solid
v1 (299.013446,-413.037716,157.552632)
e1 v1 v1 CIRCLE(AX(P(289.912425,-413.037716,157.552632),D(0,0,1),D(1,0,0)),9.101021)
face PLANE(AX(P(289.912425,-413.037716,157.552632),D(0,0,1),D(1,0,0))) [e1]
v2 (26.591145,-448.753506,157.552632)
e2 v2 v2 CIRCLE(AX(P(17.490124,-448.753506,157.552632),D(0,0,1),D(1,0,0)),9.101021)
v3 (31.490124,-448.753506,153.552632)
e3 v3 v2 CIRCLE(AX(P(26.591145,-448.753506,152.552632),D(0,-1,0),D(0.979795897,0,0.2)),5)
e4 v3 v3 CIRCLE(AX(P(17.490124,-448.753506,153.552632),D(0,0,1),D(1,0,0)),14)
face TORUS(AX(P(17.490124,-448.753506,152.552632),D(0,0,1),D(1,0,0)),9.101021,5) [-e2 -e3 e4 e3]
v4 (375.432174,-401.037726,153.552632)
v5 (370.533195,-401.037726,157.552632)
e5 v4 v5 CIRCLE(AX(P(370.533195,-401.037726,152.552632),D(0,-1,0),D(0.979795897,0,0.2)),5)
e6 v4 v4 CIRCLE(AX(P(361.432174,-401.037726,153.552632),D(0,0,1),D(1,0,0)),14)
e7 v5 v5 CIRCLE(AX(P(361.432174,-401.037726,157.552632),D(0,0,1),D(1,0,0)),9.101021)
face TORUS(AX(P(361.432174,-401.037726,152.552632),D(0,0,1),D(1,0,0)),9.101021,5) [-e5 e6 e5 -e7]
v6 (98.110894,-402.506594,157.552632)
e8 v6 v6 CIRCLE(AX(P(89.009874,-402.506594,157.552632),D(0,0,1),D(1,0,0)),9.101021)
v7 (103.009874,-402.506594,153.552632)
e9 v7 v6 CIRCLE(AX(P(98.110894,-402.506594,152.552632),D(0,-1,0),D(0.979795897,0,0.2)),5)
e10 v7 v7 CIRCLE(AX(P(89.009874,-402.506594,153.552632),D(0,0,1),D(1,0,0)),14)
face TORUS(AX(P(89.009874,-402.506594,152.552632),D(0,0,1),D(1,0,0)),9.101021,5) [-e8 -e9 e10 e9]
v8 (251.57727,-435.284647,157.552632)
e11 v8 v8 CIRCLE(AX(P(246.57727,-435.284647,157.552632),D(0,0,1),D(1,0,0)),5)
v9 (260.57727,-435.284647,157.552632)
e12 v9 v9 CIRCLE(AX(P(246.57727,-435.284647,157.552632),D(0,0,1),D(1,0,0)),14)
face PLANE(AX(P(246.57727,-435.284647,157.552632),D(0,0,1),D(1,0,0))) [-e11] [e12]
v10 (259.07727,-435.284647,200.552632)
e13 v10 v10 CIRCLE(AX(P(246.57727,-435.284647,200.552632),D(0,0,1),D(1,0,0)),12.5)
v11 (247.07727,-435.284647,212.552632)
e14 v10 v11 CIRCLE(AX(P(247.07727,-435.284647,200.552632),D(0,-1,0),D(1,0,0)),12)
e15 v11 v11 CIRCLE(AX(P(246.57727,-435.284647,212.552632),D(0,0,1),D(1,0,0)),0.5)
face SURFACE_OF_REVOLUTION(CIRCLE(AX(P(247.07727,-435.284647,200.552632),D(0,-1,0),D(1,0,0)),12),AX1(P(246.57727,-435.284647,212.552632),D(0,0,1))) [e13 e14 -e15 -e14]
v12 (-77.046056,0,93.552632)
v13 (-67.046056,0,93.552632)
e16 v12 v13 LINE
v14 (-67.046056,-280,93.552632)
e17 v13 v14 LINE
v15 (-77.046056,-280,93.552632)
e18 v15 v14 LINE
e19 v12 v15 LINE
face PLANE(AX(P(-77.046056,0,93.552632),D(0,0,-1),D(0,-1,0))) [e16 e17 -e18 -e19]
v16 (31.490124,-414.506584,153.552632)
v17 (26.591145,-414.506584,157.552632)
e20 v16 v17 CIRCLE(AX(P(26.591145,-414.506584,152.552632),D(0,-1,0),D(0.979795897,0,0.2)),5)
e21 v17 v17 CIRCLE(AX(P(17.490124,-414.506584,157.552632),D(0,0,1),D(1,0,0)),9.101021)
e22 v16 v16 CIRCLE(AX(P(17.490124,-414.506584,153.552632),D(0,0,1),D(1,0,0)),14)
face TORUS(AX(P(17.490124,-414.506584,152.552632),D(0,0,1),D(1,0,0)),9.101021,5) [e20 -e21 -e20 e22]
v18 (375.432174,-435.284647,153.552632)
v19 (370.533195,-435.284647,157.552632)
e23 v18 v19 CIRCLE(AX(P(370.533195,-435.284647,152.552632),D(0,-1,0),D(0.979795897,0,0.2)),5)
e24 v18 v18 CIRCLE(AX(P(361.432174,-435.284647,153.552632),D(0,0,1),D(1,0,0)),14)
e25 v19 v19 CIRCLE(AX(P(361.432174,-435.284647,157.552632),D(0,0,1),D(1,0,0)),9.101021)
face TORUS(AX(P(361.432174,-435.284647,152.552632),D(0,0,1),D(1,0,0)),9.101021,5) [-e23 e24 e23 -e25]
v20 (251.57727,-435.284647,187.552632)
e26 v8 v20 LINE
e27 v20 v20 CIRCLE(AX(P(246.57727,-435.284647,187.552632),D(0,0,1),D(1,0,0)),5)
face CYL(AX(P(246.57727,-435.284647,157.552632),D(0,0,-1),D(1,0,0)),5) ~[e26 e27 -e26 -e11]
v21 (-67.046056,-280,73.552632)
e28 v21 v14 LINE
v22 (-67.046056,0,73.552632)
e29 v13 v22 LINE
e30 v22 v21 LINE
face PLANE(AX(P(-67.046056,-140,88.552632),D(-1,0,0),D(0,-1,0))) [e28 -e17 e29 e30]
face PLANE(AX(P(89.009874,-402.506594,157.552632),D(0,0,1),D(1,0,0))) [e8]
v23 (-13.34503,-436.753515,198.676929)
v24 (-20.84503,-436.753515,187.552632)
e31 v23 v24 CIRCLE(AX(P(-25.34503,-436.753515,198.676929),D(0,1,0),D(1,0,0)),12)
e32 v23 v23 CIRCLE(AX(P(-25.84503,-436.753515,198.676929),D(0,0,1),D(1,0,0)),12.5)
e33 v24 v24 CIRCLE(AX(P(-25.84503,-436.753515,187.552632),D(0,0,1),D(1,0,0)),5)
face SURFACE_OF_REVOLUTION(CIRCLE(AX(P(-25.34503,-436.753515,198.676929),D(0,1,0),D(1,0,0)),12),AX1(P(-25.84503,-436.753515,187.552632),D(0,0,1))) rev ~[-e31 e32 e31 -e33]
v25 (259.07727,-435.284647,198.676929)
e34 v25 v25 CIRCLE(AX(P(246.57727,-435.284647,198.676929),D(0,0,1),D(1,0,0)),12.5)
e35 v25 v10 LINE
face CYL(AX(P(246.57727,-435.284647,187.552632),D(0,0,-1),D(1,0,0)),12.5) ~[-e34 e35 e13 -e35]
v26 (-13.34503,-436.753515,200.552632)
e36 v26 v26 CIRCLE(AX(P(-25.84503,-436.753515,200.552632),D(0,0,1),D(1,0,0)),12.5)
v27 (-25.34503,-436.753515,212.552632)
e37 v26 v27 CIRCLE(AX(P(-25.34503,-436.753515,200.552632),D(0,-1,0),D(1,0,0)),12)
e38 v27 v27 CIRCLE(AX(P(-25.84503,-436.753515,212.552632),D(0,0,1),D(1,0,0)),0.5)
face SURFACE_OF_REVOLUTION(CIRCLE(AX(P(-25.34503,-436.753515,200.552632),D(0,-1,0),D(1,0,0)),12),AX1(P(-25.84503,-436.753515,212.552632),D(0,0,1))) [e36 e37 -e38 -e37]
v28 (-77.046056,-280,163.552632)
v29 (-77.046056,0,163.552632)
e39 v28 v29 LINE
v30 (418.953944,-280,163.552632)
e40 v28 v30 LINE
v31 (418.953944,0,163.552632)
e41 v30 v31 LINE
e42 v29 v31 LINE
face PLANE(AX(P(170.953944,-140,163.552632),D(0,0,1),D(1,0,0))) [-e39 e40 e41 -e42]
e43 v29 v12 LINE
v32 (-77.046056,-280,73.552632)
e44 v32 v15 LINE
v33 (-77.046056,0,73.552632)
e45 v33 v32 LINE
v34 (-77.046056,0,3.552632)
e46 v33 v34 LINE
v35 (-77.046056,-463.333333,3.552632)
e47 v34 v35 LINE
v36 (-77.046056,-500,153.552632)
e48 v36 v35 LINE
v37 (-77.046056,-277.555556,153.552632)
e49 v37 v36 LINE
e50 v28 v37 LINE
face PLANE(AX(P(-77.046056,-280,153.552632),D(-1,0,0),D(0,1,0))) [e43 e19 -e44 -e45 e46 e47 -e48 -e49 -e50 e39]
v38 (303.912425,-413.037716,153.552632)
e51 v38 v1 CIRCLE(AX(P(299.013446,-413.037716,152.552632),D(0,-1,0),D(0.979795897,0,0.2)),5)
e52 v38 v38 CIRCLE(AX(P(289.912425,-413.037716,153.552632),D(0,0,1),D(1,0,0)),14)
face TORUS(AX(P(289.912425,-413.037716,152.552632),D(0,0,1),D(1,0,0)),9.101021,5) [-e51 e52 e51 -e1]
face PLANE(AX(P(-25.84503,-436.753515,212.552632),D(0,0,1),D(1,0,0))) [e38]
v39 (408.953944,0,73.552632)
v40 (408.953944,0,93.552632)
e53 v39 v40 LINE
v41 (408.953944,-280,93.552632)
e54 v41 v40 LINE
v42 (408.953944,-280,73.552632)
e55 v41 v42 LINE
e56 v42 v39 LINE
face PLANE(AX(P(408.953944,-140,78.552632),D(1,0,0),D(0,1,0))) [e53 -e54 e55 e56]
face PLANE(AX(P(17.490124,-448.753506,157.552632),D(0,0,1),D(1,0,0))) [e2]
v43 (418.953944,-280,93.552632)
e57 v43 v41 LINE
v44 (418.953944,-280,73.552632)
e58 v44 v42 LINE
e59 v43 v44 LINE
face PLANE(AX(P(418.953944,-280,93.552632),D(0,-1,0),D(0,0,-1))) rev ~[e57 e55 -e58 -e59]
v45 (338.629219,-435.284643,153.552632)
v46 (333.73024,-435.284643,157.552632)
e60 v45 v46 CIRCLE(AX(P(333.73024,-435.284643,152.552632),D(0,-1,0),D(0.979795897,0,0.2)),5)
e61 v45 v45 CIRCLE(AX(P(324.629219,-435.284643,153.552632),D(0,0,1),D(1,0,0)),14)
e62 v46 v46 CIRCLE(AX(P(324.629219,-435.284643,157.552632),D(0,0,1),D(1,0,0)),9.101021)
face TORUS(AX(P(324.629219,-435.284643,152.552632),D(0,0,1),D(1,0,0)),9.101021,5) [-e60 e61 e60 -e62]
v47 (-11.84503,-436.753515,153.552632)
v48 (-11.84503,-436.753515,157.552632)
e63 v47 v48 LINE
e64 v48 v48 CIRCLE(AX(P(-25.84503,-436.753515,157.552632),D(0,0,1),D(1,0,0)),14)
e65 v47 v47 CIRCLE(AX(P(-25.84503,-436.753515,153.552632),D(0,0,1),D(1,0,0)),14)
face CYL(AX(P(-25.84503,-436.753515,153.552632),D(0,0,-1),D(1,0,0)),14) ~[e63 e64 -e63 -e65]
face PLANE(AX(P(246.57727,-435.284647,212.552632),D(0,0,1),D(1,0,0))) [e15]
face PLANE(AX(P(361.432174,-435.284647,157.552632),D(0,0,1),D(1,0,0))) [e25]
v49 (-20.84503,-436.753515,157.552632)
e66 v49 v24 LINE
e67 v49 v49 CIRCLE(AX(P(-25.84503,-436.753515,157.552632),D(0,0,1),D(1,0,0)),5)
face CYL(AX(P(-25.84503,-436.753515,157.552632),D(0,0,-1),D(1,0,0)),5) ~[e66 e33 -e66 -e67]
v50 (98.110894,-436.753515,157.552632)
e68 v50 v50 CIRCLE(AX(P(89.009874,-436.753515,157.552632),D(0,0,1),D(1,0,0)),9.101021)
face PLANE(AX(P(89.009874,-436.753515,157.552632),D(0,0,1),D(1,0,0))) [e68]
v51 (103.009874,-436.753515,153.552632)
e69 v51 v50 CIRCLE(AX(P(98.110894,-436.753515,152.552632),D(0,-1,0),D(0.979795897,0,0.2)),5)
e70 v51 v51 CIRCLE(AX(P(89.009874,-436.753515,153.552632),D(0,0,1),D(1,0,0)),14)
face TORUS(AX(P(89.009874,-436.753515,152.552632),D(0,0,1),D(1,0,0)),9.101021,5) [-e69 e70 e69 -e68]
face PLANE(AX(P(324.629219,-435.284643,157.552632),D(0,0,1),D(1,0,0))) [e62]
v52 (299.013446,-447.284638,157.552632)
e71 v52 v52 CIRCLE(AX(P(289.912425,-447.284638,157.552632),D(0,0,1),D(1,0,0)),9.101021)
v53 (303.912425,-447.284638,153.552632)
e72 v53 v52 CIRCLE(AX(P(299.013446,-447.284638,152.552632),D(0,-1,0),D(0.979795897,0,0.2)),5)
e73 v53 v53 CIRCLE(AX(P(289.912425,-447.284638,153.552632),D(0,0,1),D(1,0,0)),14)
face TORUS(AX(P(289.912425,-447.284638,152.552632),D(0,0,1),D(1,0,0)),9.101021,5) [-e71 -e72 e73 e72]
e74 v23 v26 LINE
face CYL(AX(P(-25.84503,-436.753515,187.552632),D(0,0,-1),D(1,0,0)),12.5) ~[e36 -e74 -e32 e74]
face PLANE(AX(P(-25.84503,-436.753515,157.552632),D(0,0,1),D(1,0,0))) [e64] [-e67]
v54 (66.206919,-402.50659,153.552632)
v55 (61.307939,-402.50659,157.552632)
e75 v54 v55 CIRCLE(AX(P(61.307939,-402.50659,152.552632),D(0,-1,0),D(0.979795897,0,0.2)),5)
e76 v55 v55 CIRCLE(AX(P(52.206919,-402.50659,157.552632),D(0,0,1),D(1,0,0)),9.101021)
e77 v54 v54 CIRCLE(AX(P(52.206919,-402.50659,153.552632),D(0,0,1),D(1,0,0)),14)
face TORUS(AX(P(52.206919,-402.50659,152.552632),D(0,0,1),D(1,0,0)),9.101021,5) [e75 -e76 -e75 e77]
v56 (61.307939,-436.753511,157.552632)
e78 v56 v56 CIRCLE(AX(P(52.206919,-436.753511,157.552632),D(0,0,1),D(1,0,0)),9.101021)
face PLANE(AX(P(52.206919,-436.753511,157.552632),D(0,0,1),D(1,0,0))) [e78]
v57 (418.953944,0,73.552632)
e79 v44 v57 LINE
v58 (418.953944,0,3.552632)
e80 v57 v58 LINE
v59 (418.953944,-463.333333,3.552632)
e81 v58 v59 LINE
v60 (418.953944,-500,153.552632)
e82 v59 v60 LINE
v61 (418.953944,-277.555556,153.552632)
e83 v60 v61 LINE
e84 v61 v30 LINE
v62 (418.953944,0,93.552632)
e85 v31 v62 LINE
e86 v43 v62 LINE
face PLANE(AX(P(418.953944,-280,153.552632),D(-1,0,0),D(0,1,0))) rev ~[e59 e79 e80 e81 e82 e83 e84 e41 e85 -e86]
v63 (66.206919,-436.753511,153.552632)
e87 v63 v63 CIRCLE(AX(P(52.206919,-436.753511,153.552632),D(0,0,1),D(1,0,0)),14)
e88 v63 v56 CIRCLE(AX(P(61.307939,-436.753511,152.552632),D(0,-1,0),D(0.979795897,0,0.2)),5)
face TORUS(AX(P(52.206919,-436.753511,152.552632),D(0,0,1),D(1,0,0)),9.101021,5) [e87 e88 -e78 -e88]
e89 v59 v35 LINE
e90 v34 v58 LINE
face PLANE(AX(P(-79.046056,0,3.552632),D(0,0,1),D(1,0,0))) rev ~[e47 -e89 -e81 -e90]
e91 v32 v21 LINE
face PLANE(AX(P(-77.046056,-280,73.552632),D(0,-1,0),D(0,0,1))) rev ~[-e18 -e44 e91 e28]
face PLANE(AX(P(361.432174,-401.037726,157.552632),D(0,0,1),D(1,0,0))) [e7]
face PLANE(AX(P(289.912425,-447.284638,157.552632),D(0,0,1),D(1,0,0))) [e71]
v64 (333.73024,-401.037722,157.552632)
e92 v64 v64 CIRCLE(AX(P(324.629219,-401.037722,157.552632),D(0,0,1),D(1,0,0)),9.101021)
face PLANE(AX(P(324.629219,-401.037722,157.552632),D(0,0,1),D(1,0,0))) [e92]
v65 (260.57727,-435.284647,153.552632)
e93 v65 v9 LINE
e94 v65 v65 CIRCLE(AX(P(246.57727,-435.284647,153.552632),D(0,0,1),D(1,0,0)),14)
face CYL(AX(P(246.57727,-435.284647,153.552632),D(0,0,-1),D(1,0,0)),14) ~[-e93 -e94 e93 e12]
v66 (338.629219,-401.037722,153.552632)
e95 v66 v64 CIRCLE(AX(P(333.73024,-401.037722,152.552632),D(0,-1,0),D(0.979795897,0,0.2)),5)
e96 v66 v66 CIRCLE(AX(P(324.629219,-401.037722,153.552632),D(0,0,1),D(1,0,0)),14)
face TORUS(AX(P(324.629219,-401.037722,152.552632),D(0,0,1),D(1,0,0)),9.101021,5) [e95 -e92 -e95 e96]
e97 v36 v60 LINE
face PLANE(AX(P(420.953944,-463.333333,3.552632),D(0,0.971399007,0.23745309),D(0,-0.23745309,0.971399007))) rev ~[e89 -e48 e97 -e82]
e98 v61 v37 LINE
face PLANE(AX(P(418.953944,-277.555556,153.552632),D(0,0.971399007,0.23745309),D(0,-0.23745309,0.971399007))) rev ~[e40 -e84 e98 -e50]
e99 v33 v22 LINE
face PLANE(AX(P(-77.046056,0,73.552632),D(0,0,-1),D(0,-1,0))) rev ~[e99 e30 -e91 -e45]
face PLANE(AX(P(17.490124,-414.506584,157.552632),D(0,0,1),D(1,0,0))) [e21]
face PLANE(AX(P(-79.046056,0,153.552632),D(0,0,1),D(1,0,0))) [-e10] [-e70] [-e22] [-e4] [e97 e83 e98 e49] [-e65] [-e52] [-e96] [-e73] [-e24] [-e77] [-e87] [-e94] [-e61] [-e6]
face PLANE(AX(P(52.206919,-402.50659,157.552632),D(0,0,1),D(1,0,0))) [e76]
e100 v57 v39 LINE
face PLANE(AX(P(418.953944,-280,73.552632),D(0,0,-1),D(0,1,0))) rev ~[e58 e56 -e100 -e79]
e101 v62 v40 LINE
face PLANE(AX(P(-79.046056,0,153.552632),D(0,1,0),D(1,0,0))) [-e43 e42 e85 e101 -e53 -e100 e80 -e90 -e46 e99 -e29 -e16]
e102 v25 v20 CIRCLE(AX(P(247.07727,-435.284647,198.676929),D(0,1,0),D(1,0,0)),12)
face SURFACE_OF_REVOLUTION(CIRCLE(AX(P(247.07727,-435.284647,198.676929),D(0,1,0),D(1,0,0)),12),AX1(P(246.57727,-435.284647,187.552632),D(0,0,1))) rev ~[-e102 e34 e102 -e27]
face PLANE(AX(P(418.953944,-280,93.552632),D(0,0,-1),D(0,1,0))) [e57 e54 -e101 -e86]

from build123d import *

# Parameters (mm, degrees)
F0_W      = 500
F0_H      = 150
F1_DEPTH  = 500
F3_DEPTH  = 546
F4_W      = 500
F4_H      = 280
F5_DEPTH  = 10
F6_DEPTH  = 2
F7_DEPTH  = 2
F8_W      = 280
F8_H      = 10
F9_DEPTH  = 10
F10_W     = 280
F10_H     = 10
F11_DEPTH = 10
F12_R     = 14
F13_DEPTH = 4
F15_R     = 5
F16_DEPTH = 30
F17_R     = 5
F18_DEPTH = 30
F19_R     = 12.5
F19_R_2   = 5
F20_DEPTH = 25
F22_R     = 12.5
F22_R_2   = 5
F23_DEPTH = 25
F26_DEPTH = 496.001


# Not quite as in the source:
# - a fillet or chamfer that OpenCascade refuses, or shapes differently, is made with other operations: its cross-section is extruded or revolved along the edge and cut away or added


with BuildPart() as f1:
    # F0 (on Front) → F1 (new body)
    with BuildSketch(Plane.XZ):
        with Locations((170.9539443254, 78.5526317079)):
            Rectangle(F0_W, F0_H)
    extrude(amount=F1_DEPTH)

    # F2 (on face) → F3 (cut)
    with BuildSketch(Plane.YZ.offset(420.9539443254)):
        Polygon((-463.3333333489, 3.5526317079), (-500, 153.5526317079), (-500, 3.5526317079), align=None)
    extrude(amount=-F3_DEPTH, mode=Mode.SUBTRACT)

    # F4 (on face) → F5 (join)
    with BuildSketch(Plane.XY.offset(153.5526317079)):
        with Locations((170.9539443254, -140)):
            Rectangle(F4_W, F4_H)
    extrude(amount=F5_DEPTH)

    # F6 (cut): a face of the model
    f6_faces = [f1.faces().sort_by_distance(p)[0] for p in [
        (420.9539443254, -237.1833592457, 82.4533645522),
    ]]
    extrude(f6_faces, amount=-F6_DEPTH, mode=Mode.SUBTRACT)

    # F7 (cut): a face of the model
    f7_faces = [f1.faces().sort_by_distance(p)[0] for p in [
        (-79.0460556746, -237.1833592457, 82.4533645522),
    ]]
    extrude(f7_faces, amount=-F7_DEPTH, mode=Mode.SUBTRACT)

    # F8 (on face) → F9 (cut)
    with BuildSketch(Plane(origin=(-77.0460556746, 0, 0), x_dir=(0, -1, 0), z_dir=(-1, 0, 0))):
        with Locations((140, 88.5526317079)):
            Rectangle(F8_W, F8_H)
        with Locations((140, 78.5526317079)):
            Rectangle(F8_W, F8_H)
    extrude(amount=-F9_DEPTH, mode=Mode.SUBTRACT)

    # F10 (on face) → F11 (cut)
    with BuildSketch(Plane.YZ.offset(418.9539443254)):
        with Locations((-140, 78.5526317079)):
            Rectangle(F10_W, F10_H)
        with Locations((-140, 88.5526317079)):
            Rectangle(F10_W, F10_H)
    extrude(amount=-F11_DEPTH, mode=Mode.SUBTRACT)

    # F12 (on face) → F13 (join)
    with BuildSketch(Plane.XY.offset(153.5526317079)):
        with Locations((-25.8450303767, -436.7535151103)):
            Circle(F12_R)
        with Locations((17.4901243299, -448.7535059452)):
            Circle(F12_R)
        with Locations((52.2069185972, -436.7535114288)):
            Circle(F12_R)
        with Locations((89.009873569, -436.7535151103)):
            Circle(F12_R)
        with Locations((89.009873569, -402.506593571)):
            Circle(F12_R)
        with Locations((52.2069185972, -402.5065898895)):
            Circle(F12_R)
        with Locations((17.4901243299, -414.5065844059)):
            Circle(F12_R)
        with Locations((246.577270329, -435.284647045)):
            Circle(F12_R)
        with Locations((289.9124250357, -447.2846378799)):
            Circle(F12_R)
        with Locations((289.9124250357, -413.0377163406)):
            Circle(F12_R)
        with Locations((324.6292193029, -435.2846433635)):
            Circle(F12_R)
        with Locations((324.6292193029, -401.0377218242)):
            Circle(F12_R)
        with Locations((361.4321742747, -401.0377255057)):
            Circle(F12_R)
        with Locations((361.4321742747, -435.284647045)):
            Circle(F12_R)
    extrude(amount=F13_DEPTH)

    # F14: fillet of radius 5 on 12 edges, made by hand

    # F14_s1 → F14_t2 (revolve, cut)
    with BuildSketch(Plane.XZ.offset(448.7535059452)):
        with BuildLine():
            ThreePointArc((31.4901243299, 153.5526317079), (29.7534225045, 156.4256150541), (26.5911448444, 157.5526317079))
            Line((26.5911448444, 157.5526317079), (31.4901243299, 157.5526317079))
            Line((31.4901243299, 157.5526317079), (31.4901243299, 153.5526317079))
        make_face()
    revolve(axis=Axis((17.4901243299, -448.7535059452, 157.5526317079), (0, 0, 1)), mode=Mode.SUBTRACT)

    # F14_s3 → F14_t4 (revolve, cut)
    with BuildSketch(Plane.XZ.offset(414.5065844059)):
        with BuildLine():
            ThreePointArc((31.4901243299, 153.5526317079), (29.7534225045, 156.4256150541), (26.5911448444, 157.5526317079))
            Line((26.5911448444, 157.5526317079), (31.4901243299, 157.5526317079))
            Line((31.4901243299, 157.5526317079), (31.4901243299, 153.5526317079))
        make_face()
    revolve(axis=Axis((17.4901243299, -414.5065844059, 157.5526317079), (0, 0, 1)), mode=Mode.SUBTRACT)

    # F14_s5 → F14_t6 (revolve, cut)
    with BuildSketch(Plane.XZ.offset(402.5065898895)):
        with BuildLine():
            ThreePointArc((66.2069185972, 153.5526317079), (64.4702167718, 156.4256150541), (61.3079391116, 157.5526317079))
            Line((61.3079391116, 157.5526317079), (66.2069185972, 157.5526317079))
            Line((66.2069185972, 157.5526317079), (66.2069185972, 153.5526317079))
        make_face()
    revolve(axis=Axis((52.2069185972, -402.5065898895, 157.5526317079), (0, 0, 1)), mode=Mode.SUBTRACT)

    # F14_s7 → F14_t8 (revolve, cut)
    with BuildSketch(Plane.XZ.offset(436.7535114288)):
        with BuildLine():
            ThreePointArc((66.2069185972, 153.5526317079), (64.4702167718, 156.4256150541), (61.3079391116, 157.5526317079))
            Line((61.3079391116, 157.5526317079), (66.2069185972, 157.5526317079))
            Line((66.2069185972, 157.5526317079), (66.2069185972, 153.5526317079))
        make_face()
    revolve(axis=Axis((52.2069185972, -436.7535114288, 157.5526317079), (0, 0, 1)), mode=Mode.SUBTRACT)

    # F14_s9 → F14_t10 (revolve, cut)
    with BuildSketch(Plane.XZ.offset(436.7535151103)):
        with BuildLine():
            ThreePointArc((103.009873569, 153.5526317079), (101.2731717436, 156.4256150541), (98.1108940834, 157.5526317079))
            Line((98.1108940834, 157.5526317079), (103.009873569, 157.5526317079))
            Line((103.009873569, 157.5526317079), (103.009873569, 153.5526317079))
        make_face()
    revolve(axis=Axis((89.009873569, -436.7535151103, 157.5526317079), (0, 0, 1)), mode=Mode.SUBTRACT)

    # F14_s11 → F14_t12 (revolve, cut)
    with BuildSketch(Plane.XZ.offset(402.506593571)):
        with BuildLine():
            ThreePointArc((103.009873569, 153.5526317079), (101.2731717436, 156.4256150541), (98.1108940834, 157.5526317079))
            Line((98.1108940834, 157.5526317079), (103.009873569, 157.5526317079))
            Line((103.009873569, 157.5526317079), (103.009873569, 153.5526317079))
        make_face()
    revolve(axis=Axis((89.009873569, -402.506593571, 157.5526317079), (0, 0, 1)), mode=Mode.SUBTRACT)

    # F14_s13 → F14_t14 (revolve, cut)
    with BuildSketch(Plane.XZ.offset(447.2846378799)):
        with BuildLine():
            ThreePointArc((303.9124250356, 153.5526317079), (302.1757232102, 156.4256150541), (299.0134455501, 157.5526317079))
            Line((299.0134455501, 157.5526317079), (303.9124250357, 157.5526317079))
            Line((303.9124250357, 157.5526317079), (303.9124250356, 153.5526317079))
        make_face()
    revolve(axis=Axis((289.9124250357, -447.2846378799, 157.5526317079), (0, 0, 1)), mode=Mode.SUBTRACT)

    # F14_s15 → F14_t16 (revolve, cut)
    with BuildSketch(Plane.XZ.offset(413.0377163406)):
        with BuildLine():
            ThreePointArc((303.9124250356, 153.5526317079), (302.1757232102, 156.4256150541), (299.0134455501, 157.5526317079))
            Line((299.0134455501, 157.5526317079), (303.9124250357, 157.5526317079))
            Line((303.9124250357, 157.5526317079), (303.9124250356, 153.5526317079))
        make_face()
    revolve(axis=Axis((289.9124250357, -413.0377163406, 157.5526317079), (0, 0, 1)), mode=Mode.SUBTRACT)

    # F14_s17 → F14_t18 (revolve, cut)
    with BuildSketch(Plane.XZ.offset(401.0377218242)):
        with BuildLine():
            ThreePointArc((338.6292193029, 153.5526317079), (336.8925174775, 156.4256150541), (333.7302398174, 157.5526317079))
            Line((333.7302398174, 157.5526317079), (338.6292193029, 157.5526317079))
            Line((338.6292193029, 157.5526317079), (338.6292193029, 153.5526317079))
        make_face()
    revolve(axis=Axis((324.6292193029, -401.0377218242, 157.5526317079), (0, 0, 1)), mode=Mode.SUBTRACT)

    # F14_s19 → F14_t20 (revolve, cut)
    with BuildSketch(Plane.XZ.offset(435.2846433635)):
        with BuildLine():
            ThreePointArc((338.6292193029, 153.5526317079), (336.8925174775, 156.4256150541), (333.7302398174, 157.5526317079))
            Line((333.7302398174, 157.5526317079), (338.6292193029, 157.5526317079))
            Line((338.6292193029, 157.5526317079), (338.6292193029, 153.5526317079))
        make_face()
    revolve(axis=Axis((324.6292193029, -435.2846433635, 157.5526317079), (0, 0, 1)), mode=Mode.SUBTRACT)

    # F14_s21 → F14_t22 (revolve, cut)
    with BuildSketch(Plane.XZ.offset(435.284647045)):
        with BuildLine():
            ThreePointArc((375.4321742747, 153.5526317079), (373.6954724493, 156.4256150541), (370.5331947892, 157.5526317079))
            Line((370.5331947892, 157.5526317079), (375.4321742747, 157.5526317079))
            Line((375.4321742747, 157.5526317079), (375.4321742747, 153.5526317079))
        make_face()
    revolve(axis=Axis((361.4321742747, -435.284647045, 157.5526317079), (0, 0, 1)), mode=Mode.SUBTRACT)

    # F14_s23 → F14_t24 (revolve, cut)
    with BuildSketch(Plane.XZ.offset(401.0377255057)):
        with BuildLine():
            ThreePointArc((375.4321742747, 153.5526317079), (373.6954724493, 156.4256150541), (370.5331947892, 157.5526317079))
            Line((370.5331947892, 157.5526317079), (375.4321742747, 157.5526317079))
            Line((375.4321742747, 157.5526317079), (375.4321742747, 153.5526317079))
        make_face()
    revolve(axis=Axis((361.4321742747, -401.0377255057, 157.5526317079), (0, 0, 1)), mode=Mode.SUBTRACT)

    # F15 (on face) → F16 (join)
    with BuildSketch(Plane.XY.offset(157.5526317079)):
        with Locations((-25.8450303767, -436.7535151103)):
            Circle(F15_R)
    extrude(amount=F16_DEPTH)

    # F17 (on face) → F18 (join)
    with BuildSketch(Plane.XY.offset(157.5526317079)):
        with Locations((246.577270329, -435.284647045)):
            Circle(F17_R)
    extrude(amount=F18_DEPTH)

    # F19 (on face) → F20 (join)
    with BuildSketch(Plane.XY.offset(187.5526317079)):
        with Locations((-25.8450303767, -436.7535151103)):
            Circle(F19_R)
        with Locations((-25.8450303767, -436.7535151103)):
            Circle(F19_R_2, mode=Mode.SUBTRACT)
        with Locations((-25.8450303767, -436.7535151103)):
            Circle(F19_R_2)
    extrude(amount=F20_DEPTH)

    # F21: fillet of radius 12 on 2 edges, made by hand

    # F21_s1 → F21_t2 (revolve, cut)
    with BuildSketch(Plane.XZ.offset(436.7535151103)):
        with BuildLine():
            ThreePointArc((-13.3450303767, 200.5526317079), (-16.8597490025, 209.0379130821), (-25.3450303767, 212.5526317079))
            Line((-25.3450303767, 212.5526317079), (-13.3450303767, 212.5526317079))
            Line((-13.3450303767, 212.5526317079), (-13.3450303767, 200.5526317079))
        make_face()
    revolve(axis=Axis((-25.8450303767, -436.7535151103, 212.5526317079), (0, 0, 1)), mode=Mode.SUBTRACT)

    # F21_s3 → F21_t4 (revolve, cut)
    with BuildSketch(Plane.XZ.offset(436.7535151103)):
        with BuildLine():
            ThreePointArc((-13.3450303767, 198.6769294385), (-15.3951560057, 191.968725506), (-20.8450303767, 187.5526317079))
            Line((-20.8450303767, 187.5526317079), (-13.3450303767, 187.5526317079))
            Line((-13.3450303767, 187.5526317079), (-13.3450303767, 198.6769294385))
        make_face()
    revolve(axis=Axis((-25.8450303767, -436.7535151103, 187.5526317079), (0, 0, 1)), mode=Mode.SUBTRACT)

    # F22 (on face) → F23 (join)
    with BuildSketch(Plane.XY.offset(187.5526317079)):
        with Locations((246.577270329, -435.284647045)):
            Circle(F22_R)
        with Locations((246.577270329, -435.284647045)):
            Circle(F22_R_2, mode=Mode.SUBTRACT)
        with Locations((246.577270329, -435.284647045)):
            Circle(F22_R_2)
    extrude(amount=F23_DEPTH)

    # F24: fillet of radius 12 on 2 edges, made by hand

    # F24_s1 → F24_t2 (revolve, cut)
    with BuildSketch(Plane.XZ.offset(435.284647045)):
        with BuildLine():
            ThreePointArc((259.077270329, 200.5526317079), (255.5625517032, 209.0379130821), (247.077270329, 212.5526317079))
            Line((247.077270329, 212.5526317079), (259.077270329, 212.5526317079))
            Line((259.077270329, 212.5526317079), (259.077270329, 200.5526317079))
        make_face()
    revolve(axis=Axis((246.577270329, -435.284647045, 212.5526317079), (0, 0, 1)), mode=Mode.SUBTRACT)

    # F24_s3 → F24_t4 (revolve, cut)
    with BuildSketch(Plane.XZ.offset(435.284647045)):
        with BuildLine():
            ThreePointArc((259.077270329, 198.6769294385), (257.0271447001, 191.968725506), (251.577270329, 187.5526317079))
            Line((251.577270329, 187.5526317079), (259.077270329, 187.5526317079))
            Line((259.077270329, 187.5526317079), (259.077270329, 198.6769294385))
        make_face()
    revolve(axis=Axis((246.577270329, -435.284647045, 187.5526317079), (0, 0, 1)), mode=Mode.SUBTRACT)

    # F25 (on face) → F26 (cut, through all)
    with BuildSketch(Plane.YZ.offset(418.9539443254)):
        Polygon((-277.5555555566, 153.5526317079), (-280, 163.5526317079), (-280, 153.5526317079), align=None)
    extrude(amount=-F26_DEPTH, mode=Mode.SUBTRACT)


solid = f1.part
